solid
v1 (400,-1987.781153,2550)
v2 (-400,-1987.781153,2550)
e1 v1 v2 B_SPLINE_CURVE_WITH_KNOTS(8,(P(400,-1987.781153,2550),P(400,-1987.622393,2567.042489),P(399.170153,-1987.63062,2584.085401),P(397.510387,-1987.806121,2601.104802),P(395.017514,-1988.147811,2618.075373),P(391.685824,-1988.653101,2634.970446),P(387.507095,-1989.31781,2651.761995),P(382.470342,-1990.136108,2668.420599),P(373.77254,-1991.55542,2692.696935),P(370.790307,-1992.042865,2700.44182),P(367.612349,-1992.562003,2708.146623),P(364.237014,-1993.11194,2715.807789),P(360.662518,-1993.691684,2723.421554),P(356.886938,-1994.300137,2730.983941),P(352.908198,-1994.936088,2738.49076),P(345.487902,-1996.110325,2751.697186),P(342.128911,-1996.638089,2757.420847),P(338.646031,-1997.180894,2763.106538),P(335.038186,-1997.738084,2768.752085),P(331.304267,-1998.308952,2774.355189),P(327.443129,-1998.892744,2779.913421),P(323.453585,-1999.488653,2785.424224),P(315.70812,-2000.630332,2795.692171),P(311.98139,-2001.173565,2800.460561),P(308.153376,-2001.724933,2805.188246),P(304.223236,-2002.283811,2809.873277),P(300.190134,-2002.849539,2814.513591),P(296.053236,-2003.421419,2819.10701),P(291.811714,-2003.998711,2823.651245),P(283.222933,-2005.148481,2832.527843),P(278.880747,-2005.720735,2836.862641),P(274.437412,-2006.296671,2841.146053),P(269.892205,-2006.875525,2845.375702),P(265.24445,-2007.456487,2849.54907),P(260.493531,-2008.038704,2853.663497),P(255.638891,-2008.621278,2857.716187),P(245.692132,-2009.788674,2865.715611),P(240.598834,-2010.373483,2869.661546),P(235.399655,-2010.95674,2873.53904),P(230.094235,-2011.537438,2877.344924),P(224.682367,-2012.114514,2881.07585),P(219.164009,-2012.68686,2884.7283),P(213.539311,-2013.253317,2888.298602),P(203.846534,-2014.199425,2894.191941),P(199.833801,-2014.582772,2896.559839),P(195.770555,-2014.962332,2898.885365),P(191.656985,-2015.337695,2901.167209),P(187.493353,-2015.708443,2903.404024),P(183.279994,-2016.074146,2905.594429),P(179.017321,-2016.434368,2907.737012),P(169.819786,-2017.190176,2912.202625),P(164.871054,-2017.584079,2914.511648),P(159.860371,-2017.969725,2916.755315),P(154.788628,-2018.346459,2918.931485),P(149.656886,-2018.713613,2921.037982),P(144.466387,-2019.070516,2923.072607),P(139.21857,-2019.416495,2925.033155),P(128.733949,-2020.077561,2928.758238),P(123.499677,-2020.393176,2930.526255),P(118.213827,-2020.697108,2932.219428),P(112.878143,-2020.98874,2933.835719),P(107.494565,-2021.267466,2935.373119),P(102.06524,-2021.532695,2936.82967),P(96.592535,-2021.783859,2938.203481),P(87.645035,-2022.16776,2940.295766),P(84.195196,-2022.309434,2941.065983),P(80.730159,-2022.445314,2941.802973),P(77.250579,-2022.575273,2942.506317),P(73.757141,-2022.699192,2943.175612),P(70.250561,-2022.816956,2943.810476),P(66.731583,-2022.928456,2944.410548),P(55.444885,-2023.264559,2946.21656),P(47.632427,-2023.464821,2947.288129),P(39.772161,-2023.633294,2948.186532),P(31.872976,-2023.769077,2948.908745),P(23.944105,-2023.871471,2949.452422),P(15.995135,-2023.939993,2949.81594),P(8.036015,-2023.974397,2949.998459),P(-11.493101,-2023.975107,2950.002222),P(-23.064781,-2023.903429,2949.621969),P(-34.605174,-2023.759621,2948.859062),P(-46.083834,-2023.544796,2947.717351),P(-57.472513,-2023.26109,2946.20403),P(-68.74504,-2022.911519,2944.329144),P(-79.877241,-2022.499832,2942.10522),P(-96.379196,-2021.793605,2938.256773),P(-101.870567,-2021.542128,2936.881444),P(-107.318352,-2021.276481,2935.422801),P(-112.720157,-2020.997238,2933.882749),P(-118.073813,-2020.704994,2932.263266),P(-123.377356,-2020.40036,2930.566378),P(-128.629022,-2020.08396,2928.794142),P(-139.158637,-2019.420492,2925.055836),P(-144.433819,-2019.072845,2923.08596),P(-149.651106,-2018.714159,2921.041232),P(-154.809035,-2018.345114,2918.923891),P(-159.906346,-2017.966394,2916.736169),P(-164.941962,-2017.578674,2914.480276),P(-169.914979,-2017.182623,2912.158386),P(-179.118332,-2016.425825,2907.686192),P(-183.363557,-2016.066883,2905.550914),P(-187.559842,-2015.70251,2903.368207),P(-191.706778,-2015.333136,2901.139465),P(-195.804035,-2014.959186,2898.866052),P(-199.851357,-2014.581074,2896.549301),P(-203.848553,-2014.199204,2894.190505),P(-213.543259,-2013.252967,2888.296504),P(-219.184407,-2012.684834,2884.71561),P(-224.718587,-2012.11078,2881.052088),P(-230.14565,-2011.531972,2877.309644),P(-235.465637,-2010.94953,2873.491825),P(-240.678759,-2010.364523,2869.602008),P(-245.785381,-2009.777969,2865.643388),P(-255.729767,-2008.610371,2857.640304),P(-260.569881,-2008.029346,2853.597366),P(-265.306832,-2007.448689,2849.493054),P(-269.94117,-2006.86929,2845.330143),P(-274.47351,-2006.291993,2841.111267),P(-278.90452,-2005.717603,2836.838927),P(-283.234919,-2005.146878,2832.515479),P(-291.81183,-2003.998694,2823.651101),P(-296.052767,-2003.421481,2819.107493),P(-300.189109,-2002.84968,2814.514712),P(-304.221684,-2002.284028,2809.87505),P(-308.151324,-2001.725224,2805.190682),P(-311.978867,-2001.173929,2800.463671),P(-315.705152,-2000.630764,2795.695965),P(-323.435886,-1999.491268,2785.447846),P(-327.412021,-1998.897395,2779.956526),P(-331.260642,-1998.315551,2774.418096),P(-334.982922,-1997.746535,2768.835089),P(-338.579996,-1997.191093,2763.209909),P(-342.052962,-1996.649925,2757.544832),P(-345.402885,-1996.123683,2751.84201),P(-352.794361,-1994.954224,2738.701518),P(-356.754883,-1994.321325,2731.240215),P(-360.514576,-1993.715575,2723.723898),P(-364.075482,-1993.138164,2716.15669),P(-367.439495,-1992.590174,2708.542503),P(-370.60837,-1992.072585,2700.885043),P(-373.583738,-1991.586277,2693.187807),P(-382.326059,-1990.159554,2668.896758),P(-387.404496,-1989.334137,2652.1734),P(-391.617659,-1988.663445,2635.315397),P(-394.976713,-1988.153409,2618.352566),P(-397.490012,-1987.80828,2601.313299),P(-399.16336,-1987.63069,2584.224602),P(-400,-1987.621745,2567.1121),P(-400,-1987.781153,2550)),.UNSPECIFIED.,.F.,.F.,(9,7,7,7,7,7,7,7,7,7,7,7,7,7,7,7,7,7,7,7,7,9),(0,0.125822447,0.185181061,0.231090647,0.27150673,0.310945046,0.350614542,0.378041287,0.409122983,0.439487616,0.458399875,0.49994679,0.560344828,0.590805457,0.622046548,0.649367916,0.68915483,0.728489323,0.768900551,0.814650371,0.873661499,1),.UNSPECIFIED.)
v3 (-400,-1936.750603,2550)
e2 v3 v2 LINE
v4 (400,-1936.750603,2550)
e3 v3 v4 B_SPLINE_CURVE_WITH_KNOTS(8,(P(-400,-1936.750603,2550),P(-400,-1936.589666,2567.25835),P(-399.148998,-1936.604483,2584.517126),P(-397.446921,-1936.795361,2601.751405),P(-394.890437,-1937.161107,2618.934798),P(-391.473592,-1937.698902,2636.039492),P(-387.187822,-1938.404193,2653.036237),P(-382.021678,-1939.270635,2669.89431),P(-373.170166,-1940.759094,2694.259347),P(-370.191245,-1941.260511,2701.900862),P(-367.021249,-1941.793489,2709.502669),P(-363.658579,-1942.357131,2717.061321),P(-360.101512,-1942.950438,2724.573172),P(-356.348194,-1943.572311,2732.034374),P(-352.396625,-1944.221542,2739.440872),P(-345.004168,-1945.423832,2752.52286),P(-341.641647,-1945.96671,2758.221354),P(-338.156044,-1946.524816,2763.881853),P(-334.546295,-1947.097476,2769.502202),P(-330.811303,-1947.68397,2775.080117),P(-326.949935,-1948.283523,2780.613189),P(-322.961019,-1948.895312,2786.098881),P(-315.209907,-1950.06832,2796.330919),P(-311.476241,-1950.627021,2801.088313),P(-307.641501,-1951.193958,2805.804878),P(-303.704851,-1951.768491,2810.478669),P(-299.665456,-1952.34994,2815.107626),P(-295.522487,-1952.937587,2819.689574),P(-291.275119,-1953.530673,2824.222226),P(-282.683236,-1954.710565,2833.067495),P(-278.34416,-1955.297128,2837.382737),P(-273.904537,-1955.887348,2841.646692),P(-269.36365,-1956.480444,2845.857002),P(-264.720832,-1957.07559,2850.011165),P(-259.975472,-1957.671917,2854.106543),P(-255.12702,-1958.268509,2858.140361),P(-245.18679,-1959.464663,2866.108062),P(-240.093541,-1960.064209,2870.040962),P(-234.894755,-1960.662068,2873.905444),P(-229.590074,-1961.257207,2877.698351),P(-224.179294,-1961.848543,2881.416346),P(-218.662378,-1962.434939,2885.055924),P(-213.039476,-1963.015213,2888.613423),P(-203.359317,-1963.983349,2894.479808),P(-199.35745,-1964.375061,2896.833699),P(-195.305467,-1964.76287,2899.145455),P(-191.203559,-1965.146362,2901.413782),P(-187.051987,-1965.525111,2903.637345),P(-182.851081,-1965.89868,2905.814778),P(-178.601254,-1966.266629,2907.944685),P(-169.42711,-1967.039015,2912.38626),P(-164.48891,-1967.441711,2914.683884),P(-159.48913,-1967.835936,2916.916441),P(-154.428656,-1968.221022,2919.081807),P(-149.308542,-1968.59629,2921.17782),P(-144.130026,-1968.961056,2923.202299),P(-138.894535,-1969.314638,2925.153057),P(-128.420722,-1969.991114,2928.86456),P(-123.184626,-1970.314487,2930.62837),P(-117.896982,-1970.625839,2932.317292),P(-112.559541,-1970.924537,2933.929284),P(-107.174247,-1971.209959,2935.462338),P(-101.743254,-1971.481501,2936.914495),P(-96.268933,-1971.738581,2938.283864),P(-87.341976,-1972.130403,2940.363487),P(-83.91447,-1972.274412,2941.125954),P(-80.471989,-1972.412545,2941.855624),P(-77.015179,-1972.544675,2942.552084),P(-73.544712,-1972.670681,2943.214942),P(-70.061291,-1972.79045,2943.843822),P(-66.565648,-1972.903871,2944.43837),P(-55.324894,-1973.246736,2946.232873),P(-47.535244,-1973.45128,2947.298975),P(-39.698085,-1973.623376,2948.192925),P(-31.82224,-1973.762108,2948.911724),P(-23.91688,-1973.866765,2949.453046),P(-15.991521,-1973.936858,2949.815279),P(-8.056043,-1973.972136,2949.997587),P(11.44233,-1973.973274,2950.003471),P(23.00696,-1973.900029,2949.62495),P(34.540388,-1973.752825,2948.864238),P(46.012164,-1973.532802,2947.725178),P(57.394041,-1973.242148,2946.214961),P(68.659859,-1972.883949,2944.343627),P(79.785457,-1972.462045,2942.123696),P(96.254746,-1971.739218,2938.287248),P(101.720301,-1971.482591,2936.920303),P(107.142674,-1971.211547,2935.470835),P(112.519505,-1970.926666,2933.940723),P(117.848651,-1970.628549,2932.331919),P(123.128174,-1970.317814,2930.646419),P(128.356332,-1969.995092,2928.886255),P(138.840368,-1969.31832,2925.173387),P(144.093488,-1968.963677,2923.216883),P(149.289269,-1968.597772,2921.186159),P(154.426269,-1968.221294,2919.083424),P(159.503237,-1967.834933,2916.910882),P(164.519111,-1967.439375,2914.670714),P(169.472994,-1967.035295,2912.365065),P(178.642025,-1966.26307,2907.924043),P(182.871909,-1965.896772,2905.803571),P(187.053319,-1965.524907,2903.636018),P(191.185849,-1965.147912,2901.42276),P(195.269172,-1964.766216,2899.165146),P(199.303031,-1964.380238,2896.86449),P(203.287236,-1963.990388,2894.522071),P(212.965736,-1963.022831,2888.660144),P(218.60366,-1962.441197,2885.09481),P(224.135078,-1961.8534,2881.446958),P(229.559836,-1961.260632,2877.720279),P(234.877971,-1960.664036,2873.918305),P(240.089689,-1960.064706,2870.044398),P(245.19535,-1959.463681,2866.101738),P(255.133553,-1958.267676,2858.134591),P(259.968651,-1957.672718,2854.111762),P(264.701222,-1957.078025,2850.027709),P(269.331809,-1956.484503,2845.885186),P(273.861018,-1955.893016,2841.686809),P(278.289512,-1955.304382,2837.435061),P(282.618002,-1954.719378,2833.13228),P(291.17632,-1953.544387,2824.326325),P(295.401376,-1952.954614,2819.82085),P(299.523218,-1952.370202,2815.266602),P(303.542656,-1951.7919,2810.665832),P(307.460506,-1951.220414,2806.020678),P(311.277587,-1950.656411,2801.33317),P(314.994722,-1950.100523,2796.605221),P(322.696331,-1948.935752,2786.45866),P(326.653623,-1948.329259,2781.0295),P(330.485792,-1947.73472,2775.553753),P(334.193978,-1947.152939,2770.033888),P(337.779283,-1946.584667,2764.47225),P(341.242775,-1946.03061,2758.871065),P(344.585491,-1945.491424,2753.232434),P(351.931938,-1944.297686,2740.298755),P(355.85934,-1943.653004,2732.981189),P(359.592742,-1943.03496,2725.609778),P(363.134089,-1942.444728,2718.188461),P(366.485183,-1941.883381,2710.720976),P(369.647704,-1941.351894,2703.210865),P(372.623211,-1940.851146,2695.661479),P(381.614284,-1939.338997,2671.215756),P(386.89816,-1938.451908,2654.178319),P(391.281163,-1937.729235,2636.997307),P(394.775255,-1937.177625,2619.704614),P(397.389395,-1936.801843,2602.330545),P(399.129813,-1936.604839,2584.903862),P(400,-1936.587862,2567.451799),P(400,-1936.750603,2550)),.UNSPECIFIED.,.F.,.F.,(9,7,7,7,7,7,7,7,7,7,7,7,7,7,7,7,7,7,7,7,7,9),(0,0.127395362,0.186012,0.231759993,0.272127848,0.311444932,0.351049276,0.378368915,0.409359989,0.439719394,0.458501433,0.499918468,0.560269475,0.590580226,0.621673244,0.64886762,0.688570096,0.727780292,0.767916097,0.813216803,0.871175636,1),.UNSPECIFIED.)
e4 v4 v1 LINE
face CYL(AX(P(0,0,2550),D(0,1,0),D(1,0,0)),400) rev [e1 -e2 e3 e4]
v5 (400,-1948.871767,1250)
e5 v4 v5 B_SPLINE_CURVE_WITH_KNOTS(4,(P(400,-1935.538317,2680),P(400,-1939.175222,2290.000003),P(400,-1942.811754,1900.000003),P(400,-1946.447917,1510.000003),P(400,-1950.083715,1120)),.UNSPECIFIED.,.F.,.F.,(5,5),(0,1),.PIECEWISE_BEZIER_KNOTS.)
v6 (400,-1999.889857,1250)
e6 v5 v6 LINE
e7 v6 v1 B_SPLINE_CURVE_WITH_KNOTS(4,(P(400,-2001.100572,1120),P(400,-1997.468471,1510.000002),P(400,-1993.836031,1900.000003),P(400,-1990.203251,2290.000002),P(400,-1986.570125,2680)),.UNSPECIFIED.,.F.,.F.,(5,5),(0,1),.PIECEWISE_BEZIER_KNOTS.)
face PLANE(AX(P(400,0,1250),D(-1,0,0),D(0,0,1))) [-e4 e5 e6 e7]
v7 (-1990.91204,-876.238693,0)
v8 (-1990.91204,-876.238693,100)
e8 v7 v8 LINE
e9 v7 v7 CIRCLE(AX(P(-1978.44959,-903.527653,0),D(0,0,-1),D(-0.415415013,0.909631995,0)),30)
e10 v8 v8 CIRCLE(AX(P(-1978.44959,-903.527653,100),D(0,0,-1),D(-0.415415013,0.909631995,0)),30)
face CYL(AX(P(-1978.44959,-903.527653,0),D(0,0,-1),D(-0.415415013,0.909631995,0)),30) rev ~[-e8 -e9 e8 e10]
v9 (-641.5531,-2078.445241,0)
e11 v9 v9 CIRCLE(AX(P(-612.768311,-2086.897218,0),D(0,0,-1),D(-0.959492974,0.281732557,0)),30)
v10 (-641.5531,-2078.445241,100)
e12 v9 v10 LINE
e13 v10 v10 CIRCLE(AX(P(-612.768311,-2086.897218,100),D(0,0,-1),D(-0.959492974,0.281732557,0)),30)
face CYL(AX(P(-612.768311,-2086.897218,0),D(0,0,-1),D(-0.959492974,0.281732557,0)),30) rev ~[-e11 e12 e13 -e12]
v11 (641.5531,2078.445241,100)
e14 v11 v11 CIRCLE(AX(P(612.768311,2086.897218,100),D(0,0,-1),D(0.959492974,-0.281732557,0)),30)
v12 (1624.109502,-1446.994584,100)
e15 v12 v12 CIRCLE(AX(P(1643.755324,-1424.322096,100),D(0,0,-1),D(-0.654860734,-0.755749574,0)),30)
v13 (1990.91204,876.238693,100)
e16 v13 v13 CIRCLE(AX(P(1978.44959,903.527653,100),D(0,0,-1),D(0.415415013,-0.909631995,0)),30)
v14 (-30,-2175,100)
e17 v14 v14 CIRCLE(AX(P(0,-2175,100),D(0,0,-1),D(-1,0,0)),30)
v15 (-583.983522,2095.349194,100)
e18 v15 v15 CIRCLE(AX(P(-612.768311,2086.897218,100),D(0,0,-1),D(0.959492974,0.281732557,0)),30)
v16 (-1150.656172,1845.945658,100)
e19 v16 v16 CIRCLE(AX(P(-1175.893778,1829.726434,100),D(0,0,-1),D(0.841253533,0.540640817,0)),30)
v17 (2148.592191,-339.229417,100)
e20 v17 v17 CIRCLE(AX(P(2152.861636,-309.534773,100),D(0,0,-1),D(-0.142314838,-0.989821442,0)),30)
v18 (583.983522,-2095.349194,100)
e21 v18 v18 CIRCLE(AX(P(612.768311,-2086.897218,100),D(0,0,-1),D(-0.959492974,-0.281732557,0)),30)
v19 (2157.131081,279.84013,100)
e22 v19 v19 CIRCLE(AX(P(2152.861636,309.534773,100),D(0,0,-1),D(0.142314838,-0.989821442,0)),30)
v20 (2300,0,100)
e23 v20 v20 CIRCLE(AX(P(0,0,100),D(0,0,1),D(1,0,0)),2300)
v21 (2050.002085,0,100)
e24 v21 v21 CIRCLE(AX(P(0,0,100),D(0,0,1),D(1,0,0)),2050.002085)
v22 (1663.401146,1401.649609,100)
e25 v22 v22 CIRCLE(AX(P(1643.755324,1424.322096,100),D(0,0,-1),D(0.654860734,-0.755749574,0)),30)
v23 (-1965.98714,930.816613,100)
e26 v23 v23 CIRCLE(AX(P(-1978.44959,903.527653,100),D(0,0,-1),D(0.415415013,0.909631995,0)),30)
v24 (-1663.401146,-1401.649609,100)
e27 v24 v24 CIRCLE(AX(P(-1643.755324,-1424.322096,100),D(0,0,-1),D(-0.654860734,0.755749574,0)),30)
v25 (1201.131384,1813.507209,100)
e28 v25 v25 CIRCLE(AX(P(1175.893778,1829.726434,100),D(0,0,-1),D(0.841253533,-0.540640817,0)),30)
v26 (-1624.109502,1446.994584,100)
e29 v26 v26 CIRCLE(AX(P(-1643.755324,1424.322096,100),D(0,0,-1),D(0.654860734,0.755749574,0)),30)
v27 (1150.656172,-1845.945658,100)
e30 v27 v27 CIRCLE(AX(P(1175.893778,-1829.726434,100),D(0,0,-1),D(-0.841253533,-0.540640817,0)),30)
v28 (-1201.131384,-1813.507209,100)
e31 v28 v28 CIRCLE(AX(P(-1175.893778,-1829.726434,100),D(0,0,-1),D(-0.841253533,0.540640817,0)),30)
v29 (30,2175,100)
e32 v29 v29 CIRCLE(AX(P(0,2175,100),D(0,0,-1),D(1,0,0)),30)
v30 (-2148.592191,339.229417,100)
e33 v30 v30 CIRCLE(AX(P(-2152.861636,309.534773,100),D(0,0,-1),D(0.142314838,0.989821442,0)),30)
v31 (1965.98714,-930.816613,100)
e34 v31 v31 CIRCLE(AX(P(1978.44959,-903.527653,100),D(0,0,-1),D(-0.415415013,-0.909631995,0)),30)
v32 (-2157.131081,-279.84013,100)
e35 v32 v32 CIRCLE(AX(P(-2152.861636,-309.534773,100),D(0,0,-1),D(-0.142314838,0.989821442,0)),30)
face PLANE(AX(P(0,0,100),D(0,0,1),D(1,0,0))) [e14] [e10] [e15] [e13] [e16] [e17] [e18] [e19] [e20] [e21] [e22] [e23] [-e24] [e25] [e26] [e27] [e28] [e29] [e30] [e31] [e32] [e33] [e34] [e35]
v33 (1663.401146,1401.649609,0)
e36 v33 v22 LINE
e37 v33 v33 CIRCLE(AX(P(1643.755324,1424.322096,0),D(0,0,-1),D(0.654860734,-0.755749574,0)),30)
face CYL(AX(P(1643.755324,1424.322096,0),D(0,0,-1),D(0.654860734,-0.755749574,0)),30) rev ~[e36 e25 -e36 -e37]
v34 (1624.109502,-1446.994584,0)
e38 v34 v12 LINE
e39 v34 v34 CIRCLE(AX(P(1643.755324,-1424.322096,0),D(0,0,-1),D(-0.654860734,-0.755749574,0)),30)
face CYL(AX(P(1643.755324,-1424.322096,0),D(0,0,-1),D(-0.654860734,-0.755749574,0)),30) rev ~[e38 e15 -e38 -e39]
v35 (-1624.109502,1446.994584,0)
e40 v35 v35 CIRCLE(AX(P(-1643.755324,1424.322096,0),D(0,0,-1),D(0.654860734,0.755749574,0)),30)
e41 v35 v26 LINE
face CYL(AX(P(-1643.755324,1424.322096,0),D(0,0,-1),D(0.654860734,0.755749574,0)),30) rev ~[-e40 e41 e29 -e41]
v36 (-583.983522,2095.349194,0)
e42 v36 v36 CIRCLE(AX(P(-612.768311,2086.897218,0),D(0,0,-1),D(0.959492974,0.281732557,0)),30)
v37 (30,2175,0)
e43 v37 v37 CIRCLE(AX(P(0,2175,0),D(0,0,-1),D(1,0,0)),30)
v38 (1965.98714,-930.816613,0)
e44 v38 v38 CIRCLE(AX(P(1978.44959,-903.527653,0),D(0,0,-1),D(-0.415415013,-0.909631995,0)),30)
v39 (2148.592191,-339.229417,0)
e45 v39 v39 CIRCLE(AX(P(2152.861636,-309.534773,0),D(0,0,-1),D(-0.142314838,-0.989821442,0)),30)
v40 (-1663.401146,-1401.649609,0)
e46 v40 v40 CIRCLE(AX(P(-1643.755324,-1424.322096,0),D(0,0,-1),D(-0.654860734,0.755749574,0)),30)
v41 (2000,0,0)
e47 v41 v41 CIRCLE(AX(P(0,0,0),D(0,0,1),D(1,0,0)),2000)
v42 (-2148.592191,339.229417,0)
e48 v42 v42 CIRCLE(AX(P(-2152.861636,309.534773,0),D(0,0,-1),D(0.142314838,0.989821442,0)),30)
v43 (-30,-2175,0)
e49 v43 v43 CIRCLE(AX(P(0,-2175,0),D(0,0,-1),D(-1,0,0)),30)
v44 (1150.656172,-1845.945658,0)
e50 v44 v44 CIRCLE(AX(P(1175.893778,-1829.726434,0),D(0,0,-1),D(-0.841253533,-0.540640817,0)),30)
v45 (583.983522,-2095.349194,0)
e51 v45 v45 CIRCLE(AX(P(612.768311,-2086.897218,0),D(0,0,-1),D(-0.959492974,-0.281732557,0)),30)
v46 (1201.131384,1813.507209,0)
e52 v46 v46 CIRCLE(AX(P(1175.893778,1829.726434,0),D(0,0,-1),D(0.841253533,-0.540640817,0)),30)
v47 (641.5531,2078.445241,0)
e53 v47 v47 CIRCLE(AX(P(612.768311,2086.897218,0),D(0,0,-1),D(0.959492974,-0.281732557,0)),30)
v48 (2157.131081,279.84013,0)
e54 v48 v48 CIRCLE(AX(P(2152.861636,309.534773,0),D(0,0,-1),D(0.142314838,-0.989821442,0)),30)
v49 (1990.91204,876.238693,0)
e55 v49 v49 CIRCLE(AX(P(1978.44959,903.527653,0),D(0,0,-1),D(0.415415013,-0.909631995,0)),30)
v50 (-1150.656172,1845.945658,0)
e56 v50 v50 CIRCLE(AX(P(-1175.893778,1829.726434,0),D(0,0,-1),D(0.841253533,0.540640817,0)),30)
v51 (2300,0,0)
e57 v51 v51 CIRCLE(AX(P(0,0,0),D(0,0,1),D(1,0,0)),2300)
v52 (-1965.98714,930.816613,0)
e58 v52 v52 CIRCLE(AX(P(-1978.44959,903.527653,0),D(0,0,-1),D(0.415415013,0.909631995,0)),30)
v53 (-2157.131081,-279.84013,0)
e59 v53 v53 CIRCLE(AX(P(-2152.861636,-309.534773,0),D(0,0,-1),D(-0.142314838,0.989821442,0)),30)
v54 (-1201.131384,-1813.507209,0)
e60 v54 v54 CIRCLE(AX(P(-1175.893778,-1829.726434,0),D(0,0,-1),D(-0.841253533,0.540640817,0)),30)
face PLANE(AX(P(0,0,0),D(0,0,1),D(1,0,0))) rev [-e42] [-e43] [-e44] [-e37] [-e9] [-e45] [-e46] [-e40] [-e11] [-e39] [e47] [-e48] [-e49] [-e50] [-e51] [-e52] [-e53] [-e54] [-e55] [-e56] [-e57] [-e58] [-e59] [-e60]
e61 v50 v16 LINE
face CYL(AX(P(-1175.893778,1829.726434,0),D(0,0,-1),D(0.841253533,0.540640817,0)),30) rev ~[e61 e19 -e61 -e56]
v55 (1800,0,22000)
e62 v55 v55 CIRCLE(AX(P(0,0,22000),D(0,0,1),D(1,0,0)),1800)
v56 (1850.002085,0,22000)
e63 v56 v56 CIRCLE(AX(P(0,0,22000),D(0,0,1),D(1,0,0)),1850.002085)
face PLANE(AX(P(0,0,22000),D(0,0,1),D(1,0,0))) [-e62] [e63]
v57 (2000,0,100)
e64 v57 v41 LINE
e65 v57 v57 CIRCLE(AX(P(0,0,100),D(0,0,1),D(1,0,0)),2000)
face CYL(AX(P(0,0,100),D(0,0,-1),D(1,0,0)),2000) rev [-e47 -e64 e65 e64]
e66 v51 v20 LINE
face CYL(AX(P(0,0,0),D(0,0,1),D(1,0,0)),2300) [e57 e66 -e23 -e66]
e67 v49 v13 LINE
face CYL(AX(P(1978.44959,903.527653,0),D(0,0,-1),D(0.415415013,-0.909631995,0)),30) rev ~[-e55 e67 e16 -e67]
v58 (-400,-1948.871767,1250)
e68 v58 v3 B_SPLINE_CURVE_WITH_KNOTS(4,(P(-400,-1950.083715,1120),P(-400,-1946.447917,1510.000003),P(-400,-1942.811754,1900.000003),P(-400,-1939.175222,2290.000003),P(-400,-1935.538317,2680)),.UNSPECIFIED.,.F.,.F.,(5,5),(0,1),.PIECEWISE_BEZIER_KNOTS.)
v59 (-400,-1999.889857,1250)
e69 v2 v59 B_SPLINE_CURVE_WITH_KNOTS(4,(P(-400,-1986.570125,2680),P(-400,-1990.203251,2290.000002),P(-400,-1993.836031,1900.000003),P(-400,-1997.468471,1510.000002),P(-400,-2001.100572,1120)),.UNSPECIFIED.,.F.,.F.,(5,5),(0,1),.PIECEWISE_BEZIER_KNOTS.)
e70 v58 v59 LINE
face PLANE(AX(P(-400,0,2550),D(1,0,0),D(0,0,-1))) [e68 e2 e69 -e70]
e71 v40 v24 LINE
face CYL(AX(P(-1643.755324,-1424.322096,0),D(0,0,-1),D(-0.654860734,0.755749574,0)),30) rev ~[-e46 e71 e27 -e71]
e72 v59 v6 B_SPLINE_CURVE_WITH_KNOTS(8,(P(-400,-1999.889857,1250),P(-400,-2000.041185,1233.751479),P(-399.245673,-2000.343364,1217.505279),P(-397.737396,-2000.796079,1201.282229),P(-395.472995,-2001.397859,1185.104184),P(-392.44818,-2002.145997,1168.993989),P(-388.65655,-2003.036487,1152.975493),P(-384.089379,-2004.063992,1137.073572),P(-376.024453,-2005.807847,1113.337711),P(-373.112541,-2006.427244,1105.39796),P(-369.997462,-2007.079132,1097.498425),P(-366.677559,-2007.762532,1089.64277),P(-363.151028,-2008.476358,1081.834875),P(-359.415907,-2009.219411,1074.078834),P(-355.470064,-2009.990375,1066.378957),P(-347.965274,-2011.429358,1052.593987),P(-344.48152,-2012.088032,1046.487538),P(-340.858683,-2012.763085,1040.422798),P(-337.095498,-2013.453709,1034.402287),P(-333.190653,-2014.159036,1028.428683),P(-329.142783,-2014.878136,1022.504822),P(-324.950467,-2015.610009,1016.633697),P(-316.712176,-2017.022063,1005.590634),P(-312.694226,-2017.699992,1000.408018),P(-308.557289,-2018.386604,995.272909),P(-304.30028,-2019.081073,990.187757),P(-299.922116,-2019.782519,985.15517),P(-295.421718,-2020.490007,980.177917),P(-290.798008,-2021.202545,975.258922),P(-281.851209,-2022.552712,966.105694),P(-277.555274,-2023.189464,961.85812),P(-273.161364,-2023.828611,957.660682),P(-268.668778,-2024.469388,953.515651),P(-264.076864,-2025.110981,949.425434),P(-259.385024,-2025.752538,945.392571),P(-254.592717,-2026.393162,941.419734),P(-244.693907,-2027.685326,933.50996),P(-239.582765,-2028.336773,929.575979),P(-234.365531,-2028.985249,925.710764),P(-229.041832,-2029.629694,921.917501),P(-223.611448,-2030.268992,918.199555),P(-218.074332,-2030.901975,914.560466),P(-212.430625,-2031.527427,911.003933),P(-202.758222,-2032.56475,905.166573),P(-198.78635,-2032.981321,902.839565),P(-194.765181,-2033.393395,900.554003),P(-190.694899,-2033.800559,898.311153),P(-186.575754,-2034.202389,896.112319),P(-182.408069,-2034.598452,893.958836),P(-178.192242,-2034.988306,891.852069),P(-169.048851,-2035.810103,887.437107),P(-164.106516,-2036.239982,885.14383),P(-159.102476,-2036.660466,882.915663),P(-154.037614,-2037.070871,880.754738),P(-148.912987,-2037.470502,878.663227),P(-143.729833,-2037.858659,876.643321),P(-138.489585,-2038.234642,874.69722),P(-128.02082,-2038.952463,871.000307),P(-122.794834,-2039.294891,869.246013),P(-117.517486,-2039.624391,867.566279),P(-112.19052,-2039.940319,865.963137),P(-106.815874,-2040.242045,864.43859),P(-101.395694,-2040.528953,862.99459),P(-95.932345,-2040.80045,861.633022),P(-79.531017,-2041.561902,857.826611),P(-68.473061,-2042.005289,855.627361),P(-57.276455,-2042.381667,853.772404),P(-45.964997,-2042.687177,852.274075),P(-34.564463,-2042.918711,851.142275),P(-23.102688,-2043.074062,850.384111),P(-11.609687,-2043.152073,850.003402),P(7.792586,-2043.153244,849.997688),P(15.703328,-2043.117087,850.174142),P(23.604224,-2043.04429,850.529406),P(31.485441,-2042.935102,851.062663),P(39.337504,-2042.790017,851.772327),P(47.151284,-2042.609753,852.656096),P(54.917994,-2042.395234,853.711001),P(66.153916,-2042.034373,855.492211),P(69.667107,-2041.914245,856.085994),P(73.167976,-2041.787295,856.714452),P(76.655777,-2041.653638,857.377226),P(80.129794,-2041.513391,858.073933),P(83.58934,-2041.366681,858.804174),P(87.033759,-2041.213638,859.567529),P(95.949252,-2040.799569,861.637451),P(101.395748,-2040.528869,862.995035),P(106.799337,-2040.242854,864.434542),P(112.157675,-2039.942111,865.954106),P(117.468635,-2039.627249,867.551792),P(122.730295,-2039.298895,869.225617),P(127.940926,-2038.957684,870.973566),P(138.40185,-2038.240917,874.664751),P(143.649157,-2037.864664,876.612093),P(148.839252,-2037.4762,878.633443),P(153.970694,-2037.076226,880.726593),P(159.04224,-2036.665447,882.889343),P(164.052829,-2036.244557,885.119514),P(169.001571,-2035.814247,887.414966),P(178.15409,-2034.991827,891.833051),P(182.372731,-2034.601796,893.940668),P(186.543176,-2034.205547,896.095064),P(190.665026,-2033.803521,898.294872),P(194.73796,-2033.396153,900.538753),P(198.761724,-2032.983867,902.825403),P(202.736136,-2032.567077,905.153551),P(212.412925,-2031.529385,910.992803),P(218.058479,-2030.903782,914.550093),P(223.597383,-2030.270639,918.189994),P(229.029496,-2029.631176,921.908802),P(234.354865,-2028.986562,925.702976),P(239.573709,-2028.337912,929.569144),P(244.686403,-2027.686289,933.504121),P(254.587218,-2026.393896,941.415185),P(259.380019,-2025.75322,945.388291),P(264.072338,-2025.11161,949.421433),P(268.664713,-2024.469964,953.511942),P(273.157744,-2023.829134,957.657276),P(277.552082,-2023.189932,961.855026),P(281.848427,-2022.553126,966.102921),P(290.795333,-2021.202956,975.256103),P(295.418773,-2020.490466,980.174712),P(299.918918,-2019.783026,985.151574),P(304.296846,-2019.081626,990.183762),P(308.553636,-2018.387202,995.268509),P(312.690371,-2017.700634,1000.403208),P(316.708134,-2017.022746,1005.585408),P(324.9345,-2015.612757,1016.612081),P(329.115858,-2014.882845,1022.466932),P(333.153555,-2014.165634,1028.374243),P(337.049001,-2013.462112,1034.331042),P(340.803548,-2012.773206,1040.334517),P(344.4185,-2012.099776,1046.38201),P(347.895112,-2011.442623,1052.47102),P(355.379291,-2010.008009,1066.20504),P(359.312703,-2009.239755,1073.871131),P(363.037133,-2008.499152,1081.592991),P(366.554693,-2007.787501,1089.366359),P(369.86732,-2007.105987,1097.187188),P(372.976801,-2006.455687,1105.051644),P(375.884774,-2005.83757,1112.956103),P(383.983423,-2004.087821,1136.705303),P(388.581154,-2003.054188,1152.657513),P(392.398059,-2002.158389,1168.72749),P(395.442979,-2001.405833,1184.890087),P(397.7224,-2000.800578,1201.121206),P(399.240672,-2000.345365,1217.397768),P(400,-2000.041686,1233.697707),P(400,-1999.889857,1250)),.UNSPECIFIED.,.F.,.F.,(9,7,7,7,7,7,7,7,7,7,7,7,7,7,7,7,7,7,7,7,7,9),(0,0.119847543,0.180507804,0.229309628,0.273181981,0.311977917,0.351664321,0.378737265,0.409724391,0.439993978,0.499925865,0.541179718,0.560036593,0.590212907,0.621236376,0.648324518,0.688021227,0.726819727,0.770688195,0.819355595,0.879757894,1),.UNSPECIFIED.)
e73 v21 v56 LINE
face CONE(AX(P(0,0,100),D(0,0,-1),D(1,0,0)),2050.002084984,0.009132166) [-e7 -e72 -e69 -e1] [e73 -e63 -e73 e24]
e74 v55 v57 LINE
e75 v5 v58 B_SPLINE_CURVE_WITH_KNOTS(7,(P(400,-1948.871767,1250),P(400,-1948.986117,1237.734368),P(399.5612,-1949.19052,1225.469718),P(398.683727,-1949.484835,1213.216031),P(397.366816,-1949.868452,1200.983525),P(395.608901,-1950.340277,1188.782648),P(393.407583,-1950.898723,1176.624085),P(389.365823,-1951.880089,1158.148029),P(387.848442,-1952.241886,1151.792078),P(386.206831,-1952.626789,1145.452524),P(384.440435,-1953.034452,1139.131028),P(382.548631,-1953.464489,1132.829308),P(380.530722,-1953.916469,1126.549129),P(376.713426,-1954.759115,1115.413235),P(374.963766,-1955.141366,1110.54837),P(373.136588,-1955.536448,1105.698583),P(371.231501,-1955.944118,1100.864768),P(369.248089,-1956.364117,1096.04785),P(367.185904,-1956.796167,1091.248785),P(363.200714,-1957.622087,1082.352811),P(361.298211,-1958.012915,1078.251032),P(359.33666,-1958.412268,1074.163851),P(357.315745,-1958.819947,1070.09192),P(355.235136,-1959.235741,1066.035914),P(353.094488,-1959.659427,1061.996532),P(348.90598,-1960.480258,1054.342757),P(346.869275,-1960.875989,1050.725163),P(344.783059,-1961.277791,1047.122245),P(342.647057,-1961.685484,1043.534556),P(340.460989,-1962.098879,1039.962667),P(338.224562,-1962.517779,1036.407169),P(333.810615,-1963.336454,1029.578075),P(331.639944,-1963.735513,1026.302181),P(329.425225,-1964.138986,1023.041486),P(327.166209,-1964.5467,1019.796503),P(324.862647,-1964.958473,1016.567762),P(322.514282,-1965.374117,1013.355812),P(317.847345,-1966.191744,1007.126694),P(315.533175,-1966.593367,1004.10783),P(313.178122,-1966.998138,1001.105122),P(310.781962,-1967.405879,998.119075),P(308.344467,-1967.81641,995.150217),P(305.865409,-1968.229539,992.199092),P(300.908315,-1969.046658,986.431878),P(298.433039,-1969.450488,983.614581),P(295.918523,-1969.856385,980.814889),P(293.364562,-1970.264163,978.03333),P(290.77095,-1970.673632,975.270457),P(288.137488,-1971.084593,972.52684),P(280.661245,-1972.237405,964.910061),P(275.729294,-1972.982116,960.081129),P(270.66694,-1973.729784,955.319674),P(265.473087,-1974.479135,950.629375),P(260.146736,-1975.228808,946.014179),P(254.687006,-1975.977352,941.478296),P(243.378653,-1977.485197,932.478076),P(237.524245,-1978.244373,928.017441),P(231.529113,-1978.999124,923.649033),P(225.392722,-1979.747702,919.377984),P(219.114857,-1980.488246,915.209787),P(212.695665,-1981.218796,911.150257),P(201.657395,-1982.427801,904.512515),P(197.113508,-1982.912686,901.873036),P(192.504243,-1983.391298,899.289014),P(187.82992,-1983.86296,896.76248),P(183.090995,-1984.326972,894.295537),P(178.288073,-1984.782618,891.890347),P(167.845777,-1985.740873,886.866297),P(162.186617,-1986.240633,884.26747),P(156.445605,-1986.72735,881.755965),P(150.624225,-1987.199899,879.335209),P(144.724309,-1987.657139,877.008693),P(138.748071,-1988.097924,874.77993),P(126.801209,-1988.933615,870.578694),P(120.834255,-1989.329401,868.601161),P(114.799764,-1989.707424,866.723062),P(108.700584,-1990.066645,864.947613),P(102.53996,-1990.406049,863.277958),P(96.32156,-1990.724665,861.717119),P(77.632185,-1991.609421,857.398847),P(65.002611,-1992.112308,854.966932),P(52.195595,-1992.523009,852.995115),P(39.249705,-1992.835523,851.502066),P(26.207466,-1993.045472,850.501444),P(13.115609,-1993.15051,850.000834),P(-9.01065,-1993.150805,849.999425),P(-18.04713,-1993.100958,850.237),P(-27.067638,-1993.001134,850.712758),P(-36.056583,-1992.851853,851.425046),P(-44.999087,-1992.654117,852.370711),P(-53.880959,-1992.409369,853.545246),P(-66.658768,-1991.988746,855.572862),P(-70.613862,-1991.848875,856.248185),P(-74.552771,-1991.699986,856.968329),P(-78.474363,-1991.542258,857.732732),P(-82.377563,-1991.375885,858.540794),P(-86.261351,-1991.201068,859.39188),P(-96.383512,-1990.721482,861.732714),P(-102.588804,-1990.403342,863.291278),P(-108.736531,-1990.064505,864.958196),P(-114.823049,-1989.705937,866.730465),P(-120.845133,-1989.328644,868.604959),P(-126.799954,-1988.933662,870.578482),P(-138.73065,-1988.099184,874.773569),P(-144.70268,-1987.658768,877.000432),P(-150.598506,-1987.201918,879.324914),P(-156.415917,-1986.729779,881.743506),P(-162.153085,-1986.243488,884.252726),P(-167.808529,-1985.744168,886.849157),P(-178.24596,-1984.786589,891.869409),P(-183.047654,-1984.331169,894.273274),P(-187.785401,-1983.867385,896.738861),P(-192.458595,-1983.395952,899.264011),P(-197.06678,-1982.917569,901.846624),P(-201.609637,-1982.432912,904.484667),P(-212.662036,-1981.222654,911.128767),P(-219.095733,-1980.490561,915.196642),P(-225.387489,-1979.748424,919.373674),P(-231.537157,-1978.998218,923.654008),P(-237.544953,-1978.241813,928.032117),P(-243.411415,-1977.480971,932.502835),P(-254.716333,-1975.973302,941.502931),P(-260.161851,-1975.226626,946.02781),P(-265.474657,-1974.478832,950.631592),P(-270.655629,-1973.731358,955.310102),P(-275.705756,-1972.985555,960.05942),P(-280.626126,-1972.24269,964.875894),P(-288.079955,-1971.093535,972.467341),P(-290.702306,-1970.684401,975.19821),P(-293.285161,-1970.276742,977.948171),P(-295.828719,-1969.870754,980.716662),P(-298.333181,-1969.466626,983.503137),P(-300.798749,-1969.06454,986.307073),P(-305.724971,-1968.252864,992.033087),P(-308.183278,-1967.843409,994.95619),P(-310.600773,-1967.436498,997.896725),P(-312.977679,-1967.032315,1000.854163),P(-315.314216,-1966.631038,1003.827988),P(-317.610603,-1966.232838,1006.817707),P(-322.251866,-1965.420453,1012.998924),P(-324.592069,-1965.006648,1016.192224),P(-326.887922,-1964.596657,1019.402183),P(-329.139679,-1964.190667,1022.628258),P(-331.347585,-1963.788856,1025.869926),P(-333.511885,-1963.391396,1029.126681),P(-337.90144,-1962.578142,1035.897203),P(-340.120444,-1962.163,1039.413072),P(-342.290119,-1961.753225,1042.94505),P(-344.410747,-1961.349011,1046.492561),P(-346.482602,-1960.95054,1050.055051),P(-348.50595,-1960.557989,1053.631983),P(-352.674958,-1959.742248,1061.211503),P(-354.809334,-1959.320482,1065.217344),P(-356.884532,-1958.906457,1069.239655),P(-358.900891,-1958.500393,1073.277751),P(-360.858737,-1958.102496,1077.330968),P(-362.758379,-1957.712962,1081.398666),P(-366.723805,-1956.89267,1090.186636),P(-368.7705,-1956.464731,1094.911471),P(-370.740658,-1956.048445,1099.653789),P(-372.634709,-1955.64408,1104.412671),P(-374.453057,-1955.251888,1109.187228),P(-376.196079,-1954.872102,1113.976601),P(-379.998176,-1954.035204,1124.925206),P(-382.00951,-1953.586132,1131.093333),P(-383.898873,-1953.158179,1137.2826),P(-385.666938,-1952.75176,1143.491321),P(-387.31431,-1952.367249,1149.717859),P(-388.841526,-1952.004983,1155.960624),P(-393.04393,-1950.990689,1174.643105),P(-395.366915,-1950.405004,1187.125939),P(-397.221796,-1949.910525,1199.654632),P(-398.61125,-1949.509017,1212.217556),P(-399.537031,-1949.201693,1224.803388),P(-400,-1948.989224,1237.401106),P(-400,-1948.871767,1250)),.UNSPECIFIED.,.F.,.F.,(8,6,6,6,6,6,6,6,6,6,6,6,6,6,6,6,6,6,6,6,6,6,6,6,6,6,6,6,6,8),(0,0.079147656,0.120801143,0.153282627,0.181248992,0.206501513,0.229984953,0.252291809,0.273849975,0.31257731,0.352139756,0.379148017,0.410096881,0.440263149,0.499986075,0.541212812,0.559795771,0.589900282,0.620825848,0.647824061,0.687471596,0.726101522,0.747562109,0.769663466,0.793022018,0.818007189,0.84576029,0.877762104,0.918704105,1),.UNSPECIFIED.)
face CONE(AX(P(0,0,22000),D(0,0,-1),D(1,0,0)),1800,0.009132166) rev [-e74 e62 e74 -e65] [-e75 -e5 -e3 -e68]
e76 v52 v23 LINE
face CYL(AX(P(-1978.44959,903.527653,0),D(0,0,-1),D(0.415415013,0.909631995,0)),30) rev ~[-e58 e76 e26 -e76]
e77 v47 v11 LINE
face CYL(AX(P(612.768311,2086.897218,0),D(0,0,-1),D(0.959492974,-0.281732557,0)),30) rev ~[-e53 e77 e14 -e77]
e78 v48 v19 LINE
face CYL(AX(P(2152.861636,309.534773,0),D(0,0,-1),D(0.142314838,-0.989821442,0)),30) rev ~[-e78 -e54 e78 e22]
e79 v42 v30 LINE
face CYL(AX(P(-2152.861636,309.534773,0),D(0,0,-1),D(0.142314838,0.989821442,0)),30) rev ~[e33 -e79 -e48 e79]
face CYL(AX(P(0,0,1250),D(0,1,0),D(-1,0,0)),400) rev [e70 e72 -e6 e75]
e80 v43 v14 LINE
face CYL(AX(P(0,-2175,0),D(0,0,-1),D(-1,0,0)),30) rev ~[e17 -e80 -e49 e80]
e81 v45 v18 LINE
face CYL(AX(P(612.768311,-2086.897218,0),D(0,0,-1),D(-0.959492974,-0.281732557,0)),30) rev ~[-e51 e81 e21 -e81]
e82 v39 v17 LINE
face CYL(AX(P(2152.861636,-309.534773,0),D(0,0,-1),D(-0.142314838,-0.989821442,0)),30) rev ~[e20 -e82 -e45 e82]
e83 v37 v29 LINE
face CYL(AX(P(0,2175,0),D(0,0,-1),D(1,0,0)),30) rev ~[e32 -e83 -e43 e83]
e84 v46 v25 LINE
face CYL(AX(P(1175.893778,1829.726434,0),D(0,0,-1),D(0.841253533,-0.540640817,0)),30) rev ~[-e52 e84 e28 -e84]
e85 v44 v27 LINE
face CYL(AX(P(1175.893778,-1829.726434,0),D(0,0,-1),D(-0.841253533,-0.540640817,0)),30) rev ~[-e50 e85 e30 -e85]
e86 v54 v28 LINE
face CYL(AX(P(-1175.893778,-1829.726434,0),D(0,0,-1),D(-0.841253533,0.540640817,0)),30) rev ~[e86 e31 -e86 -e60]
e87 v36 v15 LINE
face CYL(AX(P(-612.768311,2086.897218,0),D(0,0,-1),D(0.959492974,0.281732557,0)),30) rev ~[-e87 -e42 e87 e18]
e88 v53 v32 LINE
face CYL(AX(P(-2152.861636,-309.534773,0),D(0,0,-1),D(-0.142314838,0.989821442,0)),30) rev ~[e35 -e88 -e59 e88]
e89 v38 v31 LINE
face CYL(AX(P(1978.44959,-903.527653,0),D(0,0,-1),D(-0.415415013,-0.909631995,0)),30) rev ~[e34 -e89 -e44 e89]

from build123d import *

# Parameters (mm, degrees)
F2_R            = 30
F3_DEPTH        = 100
F3_COPIES_COUNT = 22
F5_DEPTH        = 2500


# Not quite as in the source:
# - a pattern or mirror of a feature is missing from the dataset's text; its kind, count and spacing are read off the source's solid


with BuildPart() as f1:
    # F0 (on Front) → F1 (revolve)
    with BuildSketch(Plane.XZ):
        Polygon((2000, 100), (2000, 0), (2300, 0), (2300, 100), (2050.0020849839, 100), (1850.0020849839, 22000), (1800, 22000), align=None)
    revolve(axis=Axis((0, 0, 11000), (0, 0, 1)))

    # F2 (on face) → F3 (cut, through all)
    with BuildSketch(Plane(origin=(0, 0, 0), x_dir=(1, 0, 0), z_dir=(0, 0, -1))):
        with Locations((0, -2175)):
            Circle(F2_R)
    f3 = extrude(amount=-F3_DEPTH, mode=Mode.SUBTRACT)

    # F3_copies: F3 ×22 about axis
    f3_copies_axis = Axis((0, 0, 0), (0, 0, 1))
    for i in range(1, F3_COPIES_COUNT):
        add(f3.rotate(f3_copies_axis, i * 360 / F3_COPIES_COUNT), mode=Mode.SUBTRACT)

    # F4 (on Front) → F5 (cut)
    with BuildSketch(Plane.XZ):
        with BuildLine():
            ThreePointArc((-400, 1250), (0, 850), (400, 1250))
            Line((400, 1250), (400, 2550))
            ThreePointArc((400, 2550), (0, 2950), (-400, 2550))
            Line((-400, 2550), (-400, 1250))
        make_face()
    extrude(amount=F5_DEPTH, mode=Mode.SUBTRACT)


solid = f1.part
